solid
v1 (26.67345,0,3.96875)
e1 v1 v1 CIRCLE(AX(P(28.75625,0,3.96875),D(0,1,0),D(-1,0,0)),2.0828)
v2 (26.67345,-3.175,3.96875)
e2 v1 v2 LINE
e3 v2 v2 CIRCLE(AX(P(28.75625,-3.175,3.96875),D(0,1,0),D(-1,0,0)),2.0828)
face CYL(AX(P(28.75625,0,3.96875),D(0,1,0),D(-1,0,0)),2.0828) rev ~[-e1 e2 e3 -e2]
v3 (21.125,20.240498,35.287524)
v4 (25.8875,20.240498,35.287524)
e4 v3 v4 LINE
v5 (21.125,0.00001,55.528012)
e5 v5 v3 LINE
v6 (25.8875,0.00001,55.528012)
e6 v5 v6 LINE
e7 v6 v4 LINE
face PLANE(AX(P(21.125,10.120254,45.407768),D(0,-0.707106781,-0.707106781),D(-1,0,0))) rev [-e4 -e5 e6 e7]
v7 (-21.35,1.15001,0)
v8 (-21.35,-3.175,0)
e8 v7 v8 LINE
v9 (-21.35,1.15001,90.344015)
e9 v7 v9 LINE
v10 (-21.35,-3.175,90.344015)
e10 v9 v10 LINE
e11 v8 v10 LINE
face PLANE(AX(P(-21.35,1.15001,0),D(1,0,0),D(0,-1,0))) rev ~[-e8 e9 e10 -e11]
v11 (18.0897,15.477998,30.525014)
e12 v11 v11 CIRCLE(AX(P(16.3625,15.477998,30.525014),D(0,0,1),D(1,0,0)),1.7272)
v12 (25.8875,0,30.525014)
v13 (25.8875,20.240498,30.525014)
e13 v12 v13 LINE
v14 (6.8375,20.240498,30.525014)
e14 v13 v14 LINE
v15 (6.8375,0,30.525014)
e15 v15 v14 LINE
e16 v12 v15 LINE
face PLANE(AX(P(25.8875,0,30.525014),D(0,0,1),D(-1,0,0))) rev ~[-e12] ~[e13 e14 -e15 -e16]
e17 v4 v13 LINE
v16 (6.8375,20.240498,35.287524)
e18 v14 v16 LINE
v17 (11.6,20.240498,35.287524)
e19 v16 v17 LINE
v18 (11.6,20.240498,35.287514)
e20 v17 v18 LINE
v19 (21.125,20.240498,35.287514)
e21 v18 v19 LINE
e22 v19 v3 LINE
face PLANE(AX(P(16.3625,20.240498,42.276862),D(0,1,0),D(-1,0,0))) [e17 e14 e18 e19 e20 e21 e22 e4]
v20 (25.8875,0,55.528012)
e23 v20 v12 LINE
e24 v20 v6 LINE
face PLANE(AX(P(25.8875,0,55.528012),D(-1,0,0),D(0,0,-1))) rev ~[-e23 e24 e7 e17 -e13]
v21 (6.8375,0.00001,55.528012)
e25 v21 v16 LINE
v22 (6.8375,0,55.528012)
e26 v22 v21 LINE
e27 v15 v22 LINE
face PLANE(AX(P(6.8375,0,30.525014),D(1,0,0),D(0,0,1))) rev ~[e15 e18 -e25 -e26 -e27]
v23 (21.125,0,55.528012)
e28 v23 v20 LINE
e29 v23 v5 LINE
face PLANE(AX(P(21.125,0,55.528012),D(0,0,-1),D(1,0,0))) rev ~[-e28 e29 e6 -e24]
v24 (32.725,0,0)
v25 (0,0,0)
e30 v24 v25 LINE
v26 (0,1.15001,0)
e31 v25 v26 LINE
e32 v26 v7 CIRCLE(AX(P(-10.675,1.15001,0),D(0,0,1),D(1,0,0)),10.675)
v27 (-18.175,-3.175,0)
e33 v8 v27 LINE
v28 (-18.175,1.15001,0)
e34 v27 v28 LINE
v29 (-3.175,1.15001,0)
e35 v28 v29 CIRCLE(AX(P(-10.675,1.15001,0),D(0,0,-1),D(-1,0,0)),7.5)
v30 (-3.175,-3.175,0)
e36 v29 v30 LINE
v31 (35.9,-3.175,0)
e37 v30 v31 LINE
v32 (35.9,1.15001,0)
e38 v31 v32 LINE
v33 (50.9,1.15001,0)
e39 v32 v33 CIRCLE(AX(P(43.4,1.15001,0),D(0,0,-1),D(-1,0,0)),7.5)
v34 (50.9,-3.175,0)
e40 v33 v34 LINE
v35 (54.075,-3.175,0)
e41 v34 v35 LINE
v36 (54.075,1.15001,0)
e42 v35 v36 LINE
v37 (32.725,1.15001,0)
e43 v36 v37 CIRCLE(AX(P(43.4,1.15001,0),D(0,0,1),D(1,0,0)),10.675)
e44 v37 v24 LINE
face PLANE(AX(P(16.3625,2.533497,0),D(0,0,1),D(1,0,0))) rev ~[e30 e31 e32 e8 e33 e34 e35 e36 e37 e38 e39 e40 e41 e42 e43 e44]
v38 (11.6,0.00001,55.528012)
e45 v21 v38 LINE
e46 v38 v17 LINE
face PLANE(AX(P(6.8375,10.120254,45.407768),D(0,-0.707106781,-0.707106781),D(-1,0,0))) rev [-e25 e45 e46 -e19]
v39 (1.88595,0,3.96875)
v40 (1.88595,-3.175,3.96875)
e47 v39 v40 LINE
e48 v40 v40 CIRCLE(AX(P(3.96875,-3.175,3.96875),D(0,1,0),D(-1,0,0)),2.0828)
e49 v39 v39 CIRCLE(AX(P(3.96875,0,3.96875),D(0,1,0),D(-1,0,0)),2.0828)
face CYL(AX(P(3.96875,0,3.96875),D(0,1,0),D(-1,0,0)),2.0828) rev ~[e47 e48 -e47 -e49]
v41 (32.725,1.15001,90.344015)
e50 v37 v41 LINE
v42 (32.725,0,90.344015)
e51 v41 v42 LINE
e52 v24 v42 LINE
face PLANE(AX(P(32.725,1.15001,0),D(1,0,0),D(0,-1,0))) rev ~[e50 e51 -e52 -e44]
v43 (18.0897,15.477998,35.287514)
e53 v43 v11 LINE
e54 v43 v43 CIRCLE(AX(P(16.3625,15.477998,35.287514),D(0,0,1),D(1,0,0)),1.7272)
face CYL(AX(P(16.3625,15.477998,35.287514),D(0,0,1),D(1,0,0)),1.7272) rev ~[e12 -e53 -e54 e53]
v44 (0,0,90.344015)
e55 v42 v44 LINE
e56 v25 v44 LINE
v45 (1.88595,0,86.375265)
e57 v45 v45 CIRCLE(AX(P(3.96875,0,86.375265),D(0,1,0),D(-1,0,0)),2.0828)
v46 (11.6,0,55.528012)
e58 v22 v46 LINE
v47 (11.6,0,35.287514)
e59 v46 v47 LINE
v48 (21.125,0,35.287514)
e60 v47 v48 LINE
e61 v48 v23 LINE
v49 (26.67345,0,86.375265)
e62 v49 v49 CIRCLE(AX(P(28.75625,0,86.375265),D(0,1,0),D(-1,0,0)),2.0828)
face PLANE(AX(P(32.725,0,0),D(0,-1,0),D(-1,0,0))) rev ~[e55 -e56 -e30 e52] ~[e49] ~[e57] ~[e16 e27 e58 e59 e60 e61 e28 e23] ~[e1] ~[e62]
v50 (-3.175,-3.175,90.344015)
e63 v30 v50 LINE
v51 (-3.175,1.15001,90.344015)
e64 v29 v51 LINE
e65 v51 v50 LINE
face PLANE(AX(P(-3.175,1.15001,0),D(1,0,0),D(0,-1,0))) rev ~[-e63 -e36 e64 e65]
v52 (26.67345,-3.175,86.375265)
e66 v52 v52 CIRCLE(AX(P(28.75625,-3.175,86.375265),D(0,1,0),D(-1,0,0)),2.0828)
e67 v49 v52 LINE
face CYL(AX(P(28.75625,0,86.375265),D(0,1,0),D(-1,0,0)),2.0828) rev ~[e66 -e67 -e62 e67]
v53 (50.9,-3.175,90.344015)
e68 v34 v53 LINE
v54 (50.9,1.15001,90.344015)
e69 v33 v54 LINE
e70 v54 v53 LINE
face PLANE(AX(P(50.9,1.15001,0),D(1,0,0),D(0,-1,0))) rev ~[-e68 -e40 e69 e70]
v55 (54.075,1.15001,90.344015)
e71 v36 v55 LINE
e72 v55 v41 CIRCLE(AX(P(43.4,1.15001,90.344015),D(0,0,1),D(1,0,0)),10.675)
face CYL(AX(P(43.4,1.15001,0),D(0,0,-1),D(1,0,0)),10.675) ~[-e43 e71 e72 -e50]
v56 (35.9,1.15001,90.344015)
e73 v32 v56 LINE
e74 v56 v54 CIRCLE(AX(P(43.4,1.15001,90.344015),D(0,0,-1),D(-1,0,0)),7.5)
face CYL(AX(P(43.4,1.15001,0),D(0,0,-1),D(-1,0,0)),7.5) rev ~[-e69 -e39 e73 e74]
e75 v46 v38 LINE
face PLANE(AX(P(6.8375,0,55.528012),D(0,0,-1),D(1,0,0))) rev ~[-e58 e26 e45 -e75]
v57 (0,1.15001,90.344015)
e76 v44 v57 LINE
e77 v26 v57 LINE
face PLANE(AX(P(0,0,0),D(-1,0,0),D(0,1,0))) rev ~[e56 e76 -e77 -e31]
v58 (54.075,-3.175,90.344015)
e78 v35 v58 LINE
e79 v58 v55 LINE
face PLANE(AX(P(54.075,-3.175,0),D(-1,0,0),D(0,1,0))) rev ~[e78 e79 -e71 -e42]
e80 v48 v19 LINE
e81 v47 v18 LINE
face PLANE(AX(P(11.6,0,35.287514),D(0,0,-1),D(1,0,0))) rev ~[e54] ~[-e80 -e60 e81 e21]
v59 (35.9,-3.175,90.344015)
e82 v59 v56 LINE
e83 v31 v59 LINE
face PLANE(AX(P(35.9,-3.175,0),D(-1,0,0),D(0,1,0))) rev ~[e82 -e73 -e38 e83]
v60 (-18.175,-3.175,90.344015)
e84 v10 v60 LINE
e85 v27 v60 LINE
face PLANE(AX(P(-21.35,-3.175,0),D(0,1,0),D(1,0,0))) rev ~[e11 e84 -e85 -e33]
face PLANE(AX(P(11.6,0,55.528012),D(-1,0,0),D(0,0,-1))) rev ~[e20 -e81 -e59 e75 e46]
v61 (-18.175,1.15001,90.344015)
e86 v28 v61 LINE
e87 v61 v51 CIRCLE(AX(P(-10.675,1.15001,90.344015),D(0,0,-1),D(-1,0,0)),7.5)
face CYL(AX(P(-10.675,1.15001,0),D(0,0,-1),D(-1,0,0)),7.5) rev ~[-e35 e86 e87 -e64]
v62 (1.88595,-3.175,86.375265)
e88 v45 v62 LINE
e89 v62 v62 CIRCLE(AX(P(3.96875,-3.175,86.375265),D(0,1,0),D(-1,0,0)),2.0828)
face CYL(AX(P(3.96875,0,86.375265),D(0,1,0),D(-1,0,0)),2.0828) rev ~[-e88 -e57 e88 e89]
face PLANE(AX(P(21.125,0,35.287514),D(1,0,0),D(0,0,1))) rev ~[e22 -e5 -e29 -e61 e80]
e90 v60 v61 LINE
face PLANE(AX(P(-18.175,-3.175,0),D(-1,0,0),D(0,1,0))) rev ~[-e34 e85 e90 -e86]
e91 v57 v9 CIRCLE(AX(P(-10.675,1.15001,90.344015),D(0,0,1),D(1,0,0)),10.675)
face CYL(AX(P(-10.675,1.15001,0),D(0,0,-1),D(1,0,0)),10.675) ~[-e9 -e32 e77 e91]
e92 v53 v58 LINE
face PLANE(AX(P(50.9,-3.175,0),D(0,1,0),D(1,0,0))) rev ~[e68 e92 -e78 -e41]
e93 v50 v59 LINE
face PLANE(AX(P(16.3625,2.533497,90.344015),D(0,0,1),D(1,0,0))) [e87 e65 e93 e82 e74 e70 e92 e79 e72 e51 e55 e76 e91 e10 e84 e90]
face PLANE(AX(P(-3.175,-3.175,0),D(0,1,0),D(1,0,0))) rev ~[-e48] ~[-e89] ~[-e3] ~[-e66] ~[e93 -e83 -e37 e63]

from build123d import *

# Parameters (mm, degrees)
F1_DEPTH = 90.3440154
F2_R     = 2.0828
F3_DEPTH = 3.175
F5_DEPTH = 20.240498
F6_SIZE  = 20.240488
F7_R     = 1.7272
F8_DEPTH = 4.7625


# Not quite as in the source:
# - a fillet or chamfer is up to 0.001 mm smaller than in the source, because OpenCascade refuses the exact size


with BuildPart() as f1:
    # F0 (on Top) → F1 (new body)
    with BuildSketch(Plane.XY):
        with BuildLine():
            Line((32.7249998, 0), (0, 0))
            Line((0, 0), (0, 1.1500104))
            ThreePointArc((0, 1.1500104), (-10.675, 11.8250104), (-21.35, 1.1500104))
            Line((-21.35, 1.1500104), (-21.35, -3.175))
            Line((-21.35, -3.175), (-18.175, -3.175))
            Line((-18.175, -3.175), (-18.175, 1.1500104))
            ThreePointArc((-18.175, 1.1500104), (-10.675, 8.6500104), (-3.175, 1.1500104))
            Line((-3.175, 1.1500104), (-3.175, -3.175))
            Line((-3.175, -3.175), (35.8999998, -3.175))
            Line((35.8999998, -3.175), (35.8999998, 1.1500104))
            ThreePointArc((35.8999998, 1.1500104), (43.3999998, 8.6500104), (50.8999998, 1.1500104))
            Line((50.8999998, 1.1500104), (50.8999998, -3.175))
            Line((50.8999998, -3.175), (54.0749998, -3.175))
            Line((54.0749998, -3.175), (54.0749998, 1.1500104))
            ThreePointArc((54.0749998, 1.1500104), (43.3999998, 11.8250104), (32.7249998, 1.1500104))
            Line((32.7249998, 1.1500104), (32.7249998, 0))
        make_face()
    extrude(amount=F1_DEPTH)

    # F2 (on face) → F3 (cut, through all)
    with BuildSketch(Plane(origin=(0, 0, 0), x_dir=(-1, 0, 0), z_dir=(0, 1, 0))):
        with Locations((-3.96875, 3.96875)):
            Circle(F2_R)
        with Locations((-28.7562498, 3.96875)):
            Circle(F2_R)
        with Locations((-28.7562498, 86.3752654)):
            Circle(F2_R)
        with Locations((-3.96875, 86.3752654)):
            Circle(F2_R)
    extrude(amount=-F3_DEPTH, mode=Mode.SUBTRACT)

    # F4 (on face) → F5 (join)
    with BuildSketch(Plane(origin=(0, 0, 0), x_dir=(-1, 0, 0), z_dir=(0, 1, 0))):
        Polygon((-25.8874999, 55.52801188), (-25.8874999, 30.52501388), (-6.8374999, 30.52501388), (-6.8374999, 55.52801188), (-11.5999999, 55.52801188), (-11.5999999, 35.28751388), (-21.1249999, 35.28751388), (-21.1249999, 55.52801188), align=None)
    extrude(amount=F5_DEPTH)

    # F6 (size 20.240498 in the source; OpenCascade refuses exactly that, so slightly less here)
    f6_edges = [f1.edges().sort_by_distance(p)[0] for p in [
        (23.50625, 20.240498, 55.528012),
        (9.21875, 20.240498, 55.528012),
    ]]
    chamfer(f6_edges, length=F6_SIZE)

    # F7 (on face) → F8 (cut, through all)
    with BuildSketch(Plane.XY.offset(35.28751388)):
        with Locations((16.3624999, 15.477998)):
            Circle(F7_R)
    extrude(amount=-F8_DEPTH, mode=Mode.SUBTRACT)


solid = f1.part
